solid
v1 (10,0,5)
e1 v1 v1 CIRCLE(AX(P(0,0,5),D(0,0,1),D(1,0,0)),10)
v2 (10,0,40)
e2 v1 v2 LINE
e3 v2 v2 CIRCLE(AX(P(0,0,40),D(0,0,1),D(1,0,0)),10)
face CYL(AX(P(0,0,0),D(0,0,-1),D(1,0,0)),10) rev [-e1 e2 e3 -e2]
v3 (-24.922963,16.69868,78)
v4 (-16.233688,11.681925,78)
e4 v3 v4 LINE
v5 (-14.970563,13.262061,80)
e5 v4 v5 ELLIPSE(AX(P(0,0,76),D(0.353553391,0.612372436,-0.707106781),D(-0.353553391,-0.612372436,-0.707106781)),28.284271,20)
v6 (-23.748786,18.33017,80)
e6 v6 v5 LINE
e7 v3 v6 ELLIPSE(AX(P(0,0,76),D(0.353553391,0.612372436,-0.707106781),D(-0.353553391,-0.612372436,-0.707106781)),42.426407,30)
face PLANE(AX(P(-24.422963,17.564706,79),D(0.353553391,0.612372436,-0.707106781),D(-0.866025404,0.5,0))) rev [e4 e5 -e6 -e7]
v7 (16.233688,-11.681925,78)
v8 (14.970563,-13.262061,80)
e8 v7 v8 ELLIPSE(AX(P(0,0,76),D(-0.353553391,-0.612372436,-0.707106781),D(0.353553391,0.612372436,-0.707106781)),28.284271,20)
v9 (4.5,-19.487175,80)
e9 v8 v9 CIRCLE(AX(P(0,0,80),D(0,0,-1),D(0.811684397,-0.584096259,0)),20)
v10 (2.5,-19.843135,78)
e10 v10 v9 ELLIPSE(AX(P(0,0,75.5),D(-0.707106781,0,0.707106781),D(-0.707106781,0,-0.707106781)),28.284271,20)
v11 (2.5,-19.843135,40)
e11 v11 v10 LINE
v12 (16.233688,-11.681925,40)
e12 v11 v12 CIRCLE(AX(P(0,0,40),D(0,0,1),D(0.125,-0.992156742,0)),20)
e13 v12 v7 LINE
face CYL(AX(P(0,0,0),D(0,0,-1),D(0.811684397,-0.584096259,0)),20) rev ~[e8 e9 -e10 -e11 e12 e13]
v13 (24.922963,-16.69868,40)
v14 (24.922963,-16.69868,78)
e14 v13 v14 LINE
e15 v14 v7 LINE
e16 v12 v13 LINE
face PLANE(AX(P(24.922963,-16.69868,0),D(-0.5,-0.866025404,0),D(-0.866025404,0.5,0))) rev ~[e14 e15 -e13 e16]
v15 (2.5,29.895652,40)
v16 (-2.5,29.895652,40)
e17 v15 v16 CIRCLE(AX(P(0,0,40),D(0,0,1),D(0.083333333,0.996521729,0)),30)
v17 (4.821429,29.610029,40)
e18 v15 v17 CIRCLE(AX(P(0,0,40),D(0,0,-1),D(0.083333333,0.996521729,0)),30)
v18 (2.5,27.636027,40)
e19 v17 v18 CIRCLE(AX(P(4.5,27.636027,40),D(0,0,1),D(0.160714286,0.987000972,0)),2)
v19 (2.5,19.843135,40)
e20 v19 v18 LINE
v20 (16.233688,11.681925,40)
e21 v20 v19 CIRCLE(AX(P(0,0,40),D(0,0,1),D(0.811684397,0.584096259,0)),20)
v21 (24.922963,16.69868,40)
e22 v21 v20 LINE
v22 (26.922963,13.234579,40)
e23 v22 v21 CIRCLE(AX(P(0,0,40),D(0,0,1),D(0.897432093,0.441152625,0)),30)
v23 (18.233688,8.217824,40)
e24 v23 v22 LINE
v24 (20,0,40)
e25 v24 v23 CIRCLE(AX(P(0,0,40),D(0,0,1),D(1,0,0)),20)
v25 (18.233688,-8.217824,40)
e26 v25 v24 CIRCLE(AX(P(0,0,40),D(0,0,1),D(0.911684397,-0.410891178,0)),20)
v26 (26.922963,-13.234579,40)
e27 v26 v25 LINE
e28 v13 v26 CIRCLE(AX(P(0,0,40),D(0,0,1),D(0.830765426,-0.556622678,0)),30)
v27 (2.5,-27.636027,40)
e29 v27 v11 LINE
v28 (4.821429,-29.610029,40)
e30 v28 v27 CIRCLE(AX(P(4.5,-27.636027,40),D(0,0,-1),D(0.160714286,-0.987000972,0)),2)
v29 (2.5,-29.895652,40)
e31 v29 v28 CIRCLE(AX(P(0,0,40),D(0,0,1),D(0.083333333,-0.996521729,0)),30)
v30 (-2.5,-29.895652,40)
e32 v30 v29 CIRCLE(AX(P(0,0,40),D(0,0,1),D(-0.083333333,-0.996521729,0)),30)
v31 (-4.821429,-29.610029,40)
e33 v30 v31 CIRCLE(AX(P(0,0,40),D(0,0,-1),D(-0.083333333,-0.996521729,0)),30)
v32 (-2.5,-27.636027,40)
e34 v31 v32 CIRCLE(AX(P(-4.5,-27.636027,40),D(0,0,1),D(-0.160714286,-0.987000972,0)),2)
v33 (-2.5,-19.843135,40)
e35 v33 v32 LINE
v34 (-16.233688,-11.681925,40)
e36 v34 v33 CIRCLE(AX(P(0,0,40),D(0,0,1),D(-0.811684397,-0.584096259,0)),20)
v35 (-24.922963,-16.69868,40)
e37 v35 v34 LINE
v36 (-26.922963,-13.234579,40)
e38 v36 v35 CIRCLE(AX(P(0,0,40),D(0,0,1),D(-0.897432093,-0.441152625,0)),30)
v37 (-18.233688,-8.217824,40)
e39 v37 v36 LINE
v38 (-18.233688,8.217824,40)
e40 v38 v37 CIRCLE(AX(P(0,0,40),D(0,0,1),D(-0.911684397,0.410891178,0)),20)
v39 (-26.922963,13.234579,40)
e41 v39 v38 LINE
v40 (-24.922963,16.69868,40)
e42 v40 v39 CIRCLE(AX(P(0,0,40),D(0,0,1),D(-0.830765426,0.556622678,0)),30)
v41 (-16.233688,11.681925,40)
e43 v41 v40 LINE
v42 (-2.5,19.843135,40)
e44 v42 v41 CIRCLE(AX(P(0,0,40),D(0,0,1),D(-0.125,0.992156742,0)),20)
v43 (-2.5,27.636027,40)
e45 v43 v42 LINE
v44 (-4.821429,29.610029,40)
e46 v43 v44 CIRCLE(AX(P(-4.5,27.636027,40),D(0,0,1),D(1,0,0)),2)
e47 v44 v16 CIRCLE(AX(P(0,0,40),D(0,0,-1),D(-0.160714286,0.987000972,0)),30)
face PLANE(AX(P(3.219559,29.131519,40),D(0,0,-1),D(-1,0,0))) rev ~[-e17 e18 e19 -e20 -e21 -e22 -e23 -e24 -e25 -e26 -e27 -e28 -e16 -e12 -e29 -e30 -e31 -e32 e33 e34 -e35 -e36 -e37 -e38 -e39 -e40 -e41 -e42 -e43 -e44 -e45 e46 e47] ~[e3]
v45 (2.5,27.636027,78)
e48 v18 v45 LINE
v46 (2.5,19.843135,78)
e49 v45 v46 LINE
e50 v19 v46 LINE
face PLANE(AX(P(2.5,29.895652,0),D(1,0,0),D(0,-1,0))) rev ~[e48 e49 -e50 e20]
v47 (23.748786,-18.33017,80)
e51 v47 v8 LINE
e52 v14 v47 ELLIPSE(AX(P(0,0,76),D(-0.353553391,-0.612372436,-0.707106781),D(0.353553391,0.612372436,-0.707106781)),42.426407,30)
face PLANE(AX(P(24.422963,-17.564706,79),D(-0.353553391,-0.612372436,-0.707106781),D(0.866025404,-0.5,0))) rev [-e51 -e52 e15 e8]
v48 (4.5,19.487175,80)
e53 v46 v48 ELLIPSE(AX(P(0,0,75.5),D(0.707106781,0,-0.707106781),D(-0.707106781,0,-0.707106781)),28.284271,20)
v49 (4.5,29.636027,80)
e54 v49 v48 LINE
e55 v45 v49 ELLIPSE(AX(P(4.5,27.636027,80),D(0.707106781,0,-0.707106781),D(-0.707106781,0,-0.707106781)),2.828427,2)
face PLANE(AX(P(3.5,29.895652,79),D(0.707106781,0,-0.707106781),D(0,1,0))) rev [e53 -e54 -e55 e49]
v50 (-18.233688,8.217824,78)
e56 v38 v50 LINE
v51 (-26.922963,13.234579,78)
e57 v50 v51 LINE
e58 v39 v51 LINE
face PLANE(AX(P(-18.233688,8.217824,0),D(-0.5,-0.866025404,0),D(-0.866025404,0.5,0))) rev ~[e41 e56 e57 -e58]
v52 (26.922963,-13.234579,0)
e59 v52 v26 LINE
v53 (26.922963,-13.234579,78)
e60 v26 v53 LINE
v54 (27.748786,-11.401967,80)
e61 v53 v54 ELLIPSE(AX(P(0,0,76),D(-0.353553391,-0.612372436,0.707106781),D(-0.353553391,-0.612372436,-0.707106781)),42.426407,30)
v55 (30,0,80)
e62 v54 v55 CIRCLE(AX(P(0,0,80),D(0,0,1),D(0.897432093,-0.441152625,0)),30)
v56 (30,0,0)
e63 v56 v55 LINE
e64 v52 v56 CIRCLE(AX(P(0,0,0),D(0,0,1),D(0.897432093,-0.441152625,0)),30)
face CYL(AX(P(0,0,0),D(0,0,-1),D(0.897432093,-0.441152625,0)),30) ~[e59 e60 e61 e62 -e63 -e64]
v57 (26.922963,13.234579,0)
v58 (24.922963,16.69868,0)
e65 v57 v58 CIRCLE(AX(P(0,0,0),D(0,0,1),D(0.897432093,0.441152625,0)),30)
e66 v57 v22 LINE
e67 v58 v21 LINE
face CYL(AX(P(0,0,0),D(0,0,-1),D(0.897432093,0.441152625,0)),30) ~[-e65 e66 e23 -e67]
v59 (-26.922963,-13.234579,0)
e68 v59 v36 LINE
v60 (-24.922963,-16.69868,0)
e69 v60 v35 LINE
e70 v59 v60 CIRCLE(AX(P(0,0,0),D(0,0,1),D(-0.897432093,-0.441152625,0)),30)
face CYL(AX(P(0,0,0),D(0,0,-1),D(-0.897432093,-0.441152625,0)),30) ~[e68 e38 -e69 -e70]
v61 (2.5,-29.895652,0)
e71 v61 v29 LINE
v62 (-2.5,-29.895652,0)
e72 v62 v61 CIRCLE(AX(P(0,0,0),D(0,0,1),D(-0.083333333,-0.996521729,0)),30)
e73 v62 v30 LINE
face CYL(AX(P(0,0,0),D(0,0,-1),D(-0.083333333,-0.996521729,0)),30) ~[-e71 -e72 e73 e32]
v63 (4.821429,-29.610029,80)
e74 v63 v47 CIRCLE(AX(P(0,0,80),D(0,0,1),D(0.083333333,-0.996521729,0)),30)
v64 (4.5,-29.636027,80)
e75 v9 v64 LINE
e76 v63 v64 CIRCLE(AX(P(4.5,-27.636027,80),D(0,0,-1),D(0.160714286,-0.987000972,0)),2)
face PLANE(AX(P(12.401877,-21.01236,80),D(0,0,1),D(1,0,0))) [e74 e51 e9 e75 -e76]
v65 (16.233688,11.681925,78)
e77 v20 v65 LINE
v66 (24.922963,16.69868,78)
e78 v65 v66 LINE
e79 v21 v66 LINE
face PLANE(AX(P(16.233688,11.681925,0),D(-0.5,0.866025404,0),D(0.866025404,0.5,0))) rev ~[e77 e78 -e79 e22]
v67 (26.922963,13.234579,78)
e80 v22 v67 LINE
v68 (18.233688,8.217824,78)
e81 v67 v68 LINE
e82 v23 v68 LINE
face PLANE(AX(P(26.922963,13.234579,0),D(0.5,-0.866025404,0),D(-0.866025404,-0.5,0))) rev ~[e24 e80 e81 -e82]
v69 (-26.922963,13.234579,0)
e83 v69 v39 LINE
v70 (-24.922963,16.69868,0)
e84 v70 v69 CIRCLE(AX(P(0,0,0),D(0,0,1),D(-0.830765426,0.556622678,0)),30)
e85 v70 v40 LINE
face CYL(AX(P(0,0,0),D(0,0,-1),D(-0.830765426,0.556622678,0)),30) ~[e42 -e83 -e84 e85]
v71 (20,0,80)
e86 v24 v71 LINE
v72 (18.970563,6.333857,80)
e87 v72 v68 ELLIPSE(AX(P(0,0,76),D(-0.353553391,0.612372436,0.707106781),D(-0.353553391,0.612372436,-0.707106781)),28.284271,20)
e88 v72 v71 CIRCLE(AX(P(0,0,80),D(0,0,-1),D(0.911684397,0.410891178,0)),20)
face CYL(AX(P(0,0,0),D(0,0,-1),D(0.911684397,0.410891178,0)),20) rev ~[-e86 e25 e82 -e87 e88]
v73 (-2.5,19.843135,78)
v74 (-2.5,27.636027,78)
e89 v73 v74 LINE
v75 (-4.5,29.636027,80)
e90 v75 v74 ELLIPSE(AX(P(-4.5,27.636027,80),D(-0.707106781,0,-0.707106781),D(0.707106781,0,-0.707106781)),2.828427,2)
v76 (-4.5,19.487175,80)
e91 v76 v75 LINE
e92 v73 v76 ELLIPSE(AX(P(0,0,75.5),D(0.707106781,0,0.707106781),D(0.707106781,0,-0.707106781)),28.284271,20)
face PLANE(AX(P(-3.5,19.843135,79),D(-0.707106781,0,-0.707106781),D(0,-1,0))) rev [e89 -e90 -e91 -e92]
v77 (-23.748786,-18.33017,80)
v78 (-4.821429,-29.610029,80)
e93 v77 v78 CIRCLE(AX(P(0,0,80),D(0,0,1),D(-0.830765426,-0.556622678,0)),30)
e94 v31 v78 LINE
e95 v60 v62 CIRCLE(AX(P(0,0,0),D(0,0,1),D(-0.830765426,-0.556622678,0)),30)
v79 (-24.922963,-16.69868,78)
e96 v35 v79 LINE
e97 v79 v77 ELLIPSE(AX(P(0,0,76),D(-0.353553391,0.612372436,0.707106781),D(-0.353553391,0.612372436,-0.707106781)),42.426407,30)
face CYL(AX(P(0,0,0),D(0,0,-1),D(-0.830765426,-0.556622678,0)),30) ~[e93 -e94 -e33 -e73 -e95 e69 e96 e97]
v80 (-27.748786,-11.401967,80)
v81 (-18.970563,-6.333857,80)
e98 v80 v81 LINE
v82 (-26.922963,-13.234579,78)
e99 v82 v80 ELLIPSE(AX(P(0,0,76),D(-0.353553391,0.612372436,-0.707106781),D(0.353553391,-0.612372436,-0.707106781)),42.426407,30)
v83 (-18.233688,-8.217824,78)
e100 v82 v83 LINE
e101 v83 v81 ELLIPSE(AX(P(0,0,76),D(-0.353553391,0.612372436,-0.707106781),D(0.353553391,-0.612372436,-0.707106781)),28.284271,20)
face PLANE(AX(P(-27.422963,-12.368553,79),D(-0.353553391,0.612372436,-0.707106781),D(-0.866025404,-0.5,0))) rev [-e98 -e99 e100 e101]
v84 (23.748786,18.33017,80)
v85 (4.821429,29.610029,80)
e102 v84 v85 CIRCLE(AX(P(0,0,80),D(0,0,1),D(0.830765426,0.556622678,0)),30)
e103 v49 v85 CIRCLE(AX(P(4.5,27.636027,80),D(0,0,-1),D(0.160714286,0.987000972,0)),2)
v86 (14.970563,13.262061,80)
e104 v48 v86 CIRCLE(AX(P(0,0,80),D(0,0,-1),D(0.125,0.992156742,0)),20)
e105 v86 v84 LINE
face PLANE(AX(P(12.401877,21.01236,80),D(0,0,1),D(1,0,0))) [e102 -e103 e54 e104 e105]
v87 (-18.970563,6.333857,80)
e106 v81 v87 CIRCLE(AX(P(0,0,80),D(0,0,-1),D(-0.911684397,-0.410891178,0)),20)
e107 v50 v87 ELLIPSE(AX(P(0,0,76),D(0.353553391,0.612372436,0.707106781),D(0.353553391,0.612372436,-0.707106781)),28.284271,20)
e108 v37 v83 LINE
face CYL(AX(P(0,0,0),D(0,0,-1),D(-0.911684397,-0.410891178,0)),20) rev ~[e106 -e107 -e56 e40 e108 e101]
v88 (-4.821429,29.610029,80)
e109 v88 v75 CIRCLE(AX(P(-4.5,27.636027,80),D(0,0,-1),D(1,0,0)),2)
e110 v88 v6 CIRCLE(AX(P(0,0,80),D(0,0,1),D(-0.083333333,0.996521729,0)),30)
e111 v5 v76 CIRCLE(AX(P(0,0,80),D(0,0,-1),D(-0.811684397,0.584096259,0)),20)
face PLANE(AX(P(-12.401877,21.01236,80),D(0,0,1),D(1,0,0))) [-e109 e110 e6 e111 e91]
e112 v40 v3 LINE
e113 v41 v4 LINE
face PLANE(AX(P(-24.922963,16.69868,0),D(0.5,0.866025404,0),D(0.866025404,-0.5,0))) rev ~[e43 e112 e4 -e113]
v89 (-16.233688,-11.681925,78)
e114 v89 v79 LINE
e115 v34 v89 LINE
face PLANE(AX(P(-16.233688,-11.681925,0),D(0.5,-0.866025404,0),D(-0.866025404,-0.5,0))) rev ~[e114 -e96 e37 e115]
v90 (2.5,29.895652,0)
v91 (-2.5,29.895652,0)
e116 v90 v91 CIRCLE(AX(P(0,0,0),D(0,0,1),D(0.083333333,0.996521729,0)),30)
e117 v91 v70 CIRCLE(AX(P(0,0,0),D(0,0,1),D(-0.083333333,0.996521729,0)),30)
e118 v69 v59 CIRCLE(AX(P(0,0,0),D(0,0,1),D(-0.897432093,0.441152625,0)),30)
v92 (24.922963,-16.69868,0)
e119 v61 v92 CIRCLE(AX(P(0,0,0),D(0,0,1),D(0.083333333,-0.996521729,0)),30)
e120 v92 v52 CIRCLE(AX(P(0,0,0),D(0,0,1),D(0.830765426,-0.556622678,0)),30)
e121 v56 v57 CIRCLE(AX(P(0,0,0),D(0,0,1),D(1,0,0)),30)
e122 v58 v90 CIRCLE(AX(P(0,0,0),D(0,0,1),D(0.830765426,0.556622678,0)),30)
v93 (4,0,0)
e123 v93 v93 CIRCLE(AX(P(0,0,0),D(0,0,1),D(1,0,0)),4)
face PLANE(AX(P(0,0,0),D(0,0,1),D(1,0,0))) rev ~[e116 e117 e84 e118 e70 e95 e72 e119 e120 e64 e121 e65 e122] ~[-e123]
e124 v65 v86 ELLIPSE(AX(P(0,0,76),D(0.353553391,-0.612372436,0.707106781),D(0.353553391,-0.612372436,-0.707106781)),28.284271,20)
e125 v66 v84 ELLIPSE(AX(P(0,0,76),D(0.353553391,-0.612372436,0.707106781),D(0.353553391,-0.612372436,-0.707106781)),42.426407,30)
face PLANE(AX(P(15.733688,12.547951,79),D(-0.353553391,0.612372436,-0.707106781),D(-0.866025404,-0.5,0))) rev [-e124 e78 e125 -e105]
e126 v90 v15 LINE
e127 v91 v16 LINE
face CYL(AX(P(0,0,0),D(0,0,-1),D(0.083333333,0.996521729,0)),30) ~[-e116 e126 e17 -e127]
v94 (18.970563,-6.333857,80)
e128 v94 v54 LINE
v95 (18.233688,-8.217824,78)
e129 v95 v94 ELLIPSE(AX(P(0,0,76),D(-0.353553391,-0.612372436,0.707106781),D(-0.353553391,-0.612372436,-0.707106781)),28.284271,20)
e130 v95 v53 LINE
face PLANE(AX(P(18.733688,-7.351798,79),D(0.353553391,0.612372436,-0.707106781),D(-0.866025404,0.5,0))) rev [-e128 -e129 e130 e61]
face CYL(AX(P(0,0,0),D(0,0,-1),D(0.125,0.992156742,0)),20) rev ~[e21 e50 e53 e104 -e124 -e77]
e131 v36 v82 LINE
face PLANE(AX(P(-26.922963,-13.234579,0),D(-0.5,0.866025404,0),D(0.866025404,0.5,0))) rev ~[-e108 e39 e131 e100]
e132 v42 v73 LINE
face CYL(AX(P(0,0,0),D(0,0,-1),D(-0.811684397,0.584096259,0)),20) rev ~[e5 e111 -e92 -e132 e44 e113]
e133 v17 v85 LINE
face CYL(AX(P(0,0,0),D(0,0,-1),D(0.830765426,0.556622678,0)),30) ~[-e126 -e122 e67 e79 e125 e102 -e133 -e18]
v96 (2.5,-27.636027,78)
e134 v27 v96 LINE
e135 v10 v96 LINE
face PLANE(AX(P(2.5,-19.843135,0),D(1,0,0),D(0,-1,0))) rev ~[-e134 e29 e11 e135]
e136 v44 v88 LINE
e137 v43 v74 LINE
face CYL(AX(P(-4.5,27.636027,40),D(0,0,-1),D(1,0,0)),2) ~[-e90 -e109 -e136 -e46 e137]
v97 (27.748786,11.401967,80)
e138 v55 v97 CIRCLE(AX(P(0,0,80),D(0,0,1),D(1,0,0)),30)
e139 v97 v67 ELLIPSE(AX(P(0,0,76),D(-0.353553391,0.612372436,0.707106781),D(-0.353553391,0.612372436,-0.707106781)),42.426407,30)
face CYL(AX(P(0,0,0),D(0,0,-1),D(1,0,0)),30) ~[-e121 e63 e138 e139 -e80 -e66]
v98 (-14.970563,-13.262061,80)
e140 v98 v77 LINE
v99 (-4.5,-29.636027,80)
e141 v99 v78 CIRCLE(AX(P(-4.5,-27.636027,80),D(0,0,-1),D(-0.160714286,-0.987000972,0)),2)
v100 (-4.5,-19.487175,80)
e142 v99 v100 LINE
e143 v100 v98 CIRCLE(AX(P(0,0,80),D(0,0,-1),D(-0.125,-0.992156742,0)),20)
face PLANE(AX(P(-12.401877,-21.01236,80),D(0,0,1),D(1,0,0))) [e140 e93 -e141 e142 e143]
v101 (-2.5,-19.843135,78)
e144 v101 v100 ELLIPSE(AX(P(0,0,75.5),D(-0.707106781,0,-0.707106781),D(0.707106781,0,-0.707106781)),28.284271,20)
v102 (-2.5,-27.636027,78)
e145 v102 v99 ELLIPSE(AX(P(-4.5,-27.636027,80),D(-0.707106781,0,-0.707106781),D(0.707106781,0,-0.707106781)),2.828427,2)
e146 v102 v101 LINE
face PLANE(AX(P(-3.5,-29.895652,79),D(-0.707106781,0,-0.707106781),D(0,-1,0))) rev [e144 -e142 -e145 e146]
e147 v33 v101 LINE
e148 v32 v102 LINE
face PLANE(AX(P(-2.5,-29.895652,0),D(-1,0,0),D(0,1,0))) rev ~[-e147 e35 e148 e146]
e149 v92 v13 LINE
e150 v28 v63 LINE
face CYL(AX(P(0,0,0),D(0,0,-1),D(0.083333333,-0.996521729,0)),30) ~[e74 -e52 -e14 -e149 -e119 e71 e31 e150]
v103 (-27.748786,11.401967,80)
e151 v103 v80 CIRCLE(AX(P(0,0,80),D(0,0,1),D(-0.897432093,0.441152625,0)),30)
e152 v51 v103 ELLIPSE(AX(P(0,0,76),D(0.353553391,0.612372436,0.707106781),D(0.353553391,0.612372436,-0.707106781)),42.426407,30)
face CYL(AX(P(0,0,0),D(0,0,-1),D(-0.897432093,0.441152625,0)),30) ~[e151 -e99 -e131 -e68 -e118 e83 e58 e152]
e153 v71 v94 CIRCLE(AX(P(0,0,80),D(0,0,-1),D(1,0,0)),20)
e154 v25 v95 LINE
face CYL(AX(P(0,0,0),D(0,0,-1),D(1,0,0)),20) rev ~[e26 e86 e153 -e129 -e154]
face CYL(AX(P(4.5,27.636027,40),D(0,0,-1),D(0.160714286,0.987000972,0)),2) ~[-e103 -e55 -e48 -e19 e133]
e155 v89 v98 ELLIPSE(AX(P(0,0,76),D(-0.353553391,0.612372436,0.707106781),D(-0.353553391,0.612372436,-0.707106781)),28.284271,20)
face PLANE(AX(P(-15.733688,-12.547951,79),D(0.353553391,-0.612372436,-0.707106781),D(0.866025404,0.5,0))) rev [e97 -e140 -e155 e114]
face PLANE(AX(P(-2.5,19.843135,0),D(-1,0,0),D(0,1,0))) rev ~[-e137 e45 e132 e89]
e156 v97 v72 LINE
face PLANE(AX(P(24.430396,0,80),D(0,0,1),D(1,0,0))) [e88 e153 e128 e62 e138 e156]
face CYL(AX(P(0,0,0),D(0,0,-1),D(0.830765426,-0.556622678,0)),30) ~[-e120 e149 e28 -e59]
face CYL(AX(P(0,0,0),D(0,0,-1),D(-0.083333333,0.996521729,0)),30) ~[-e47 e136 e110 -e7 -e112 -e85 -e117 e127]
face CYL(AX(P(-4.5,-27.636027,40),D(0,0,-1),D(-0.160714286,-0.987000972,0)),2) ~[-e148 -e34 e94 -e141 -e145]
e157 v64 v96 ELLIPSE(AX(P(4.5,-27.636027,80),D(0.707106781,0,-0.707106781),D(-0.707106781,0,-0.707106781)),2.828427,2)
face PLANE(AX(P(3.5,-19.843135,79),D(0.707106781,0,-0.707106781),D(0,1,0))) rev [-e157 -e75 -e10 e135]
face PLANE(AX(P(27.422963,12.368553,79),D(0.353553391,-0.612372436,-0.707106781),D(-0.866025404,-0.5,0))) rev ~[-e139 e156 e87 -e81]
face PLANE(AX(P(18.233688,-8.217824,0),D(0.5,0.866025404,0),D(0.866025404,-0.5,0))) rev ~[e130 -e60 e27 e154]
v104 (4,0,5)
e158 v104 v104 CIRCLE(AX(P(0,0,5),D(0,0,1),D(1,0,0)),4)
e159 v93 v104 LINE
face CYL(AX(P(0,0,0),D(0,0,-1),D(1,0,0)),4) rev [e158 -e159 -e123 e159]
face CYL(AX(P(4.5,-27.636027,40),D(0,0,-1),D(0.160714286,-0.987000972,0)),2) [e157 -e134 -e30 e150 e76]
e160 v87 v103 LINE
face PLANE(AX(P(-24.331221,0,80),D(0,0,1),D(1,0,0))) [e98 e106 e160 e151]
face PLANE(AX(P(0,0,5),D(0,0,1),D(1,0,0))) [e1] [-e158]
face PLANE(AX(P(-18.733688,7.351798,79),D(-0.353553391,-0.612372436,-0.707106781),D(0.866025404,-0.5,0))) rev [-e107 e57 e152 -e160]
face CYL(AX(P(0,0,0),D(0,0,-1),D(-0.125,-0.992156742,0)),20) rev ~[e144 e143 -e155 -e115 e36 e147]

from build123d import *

# Parameters (mm, degrees)
F1_DEPTH    = 80
F0_R        = 10
F2_DEPTH    = 40
F0_R_2      = 4
F3_DEPTH    = 5
F4_SIZE     = 2
F5_T1_DEPTH = 43.847334297


# Not quite as in the source:
# - a fillet or chamfer that OpenCascade refuses, or shapes differently, is made with other operations: its cross-section is extruded or revolved along the edge and cut away or added


with BuildPart() as f1:
    # F0 (on Top) → F1 (new body)
    with BuildSketch(Plane.XY):
        with BuildLine():
            ThreePointArc((26.9229627936, -13.2345787395), (29.220616727, -6.7937881992), (30, 0))
            ThreePointArc((30, 0), (29.220616727, 6.7937881992), (26.9229627936, 13.2345787395))
            Line((26.9229627936, 13.2345787395), (18.2336879396, 8.2178235635))
            ThreePointArc((18.2336879396, 8.2178235635), (19.5534365112, 4.2027515515), (20, 0))
            ThreePointArc((20, 0), (19.5534365112, -4.2027515515), (18.2336879396, -8.2178235635))
            Line((18.2336879396, -8.2178235635), (26.9229627936, -13.2345787395))
        make_face()
    extrude(amount=F1_DEPTH)



with BuildPart() as f1b:
    # F0 (on Top) → F1, piece 2 (new body)
    with BuildSketch(Plane.XY):
        with BuildLine():
            Line((16.2336879396, 11.6819251786), (24.9229627936, 16.6986803547))
            ThreePointArc((24.9229627936, 16.6986803547), (15.21659411, 25.8545018071), (2.5, 29.8956518578))
            Line((2.5, 29.8956518578), (2.5, 19.843134833))
            ThreePointArc((2.5, 19.843134833), (10.2170984976, 17.1933387767), (16.2336879396, 11.6819251786))
        make_face()
    extrude(amount=F1_DEPTH)


with BuildPart() as f1c:
    # F0 (on Top) → F1, piece 3 (new body)
    with BuildSketch(Plane.XY):
        with BuildLine():
            ThreePointArc((2.5, -29.8956518578), (15.21659411, -25.8545018071), (24.9229627936, -16.6986803547))
            Line((24.9229627936, -16.6986803547), (16.2336879396, -11.6819251786))
            ThreePointArc((16.2336879396, -11.6819251786), (10.2170984976, -17.1933387767), (2.5, -19.843134833))
            Line((2.5, -19.843134833), (2.5, -29.8956518578))
        make_face()
    extrude(amount=F1_DEPTH)


with BuildPart() as f1d:
    # F0 (on Top) → F1, piece 4 (new body)
    with BuildSketch(Plane.XY):
        with BuildLine():
            Line((-2.5, 19.843134833), (-2.5, 29.8956518578))
            ThreePointArc((-2.5, 29.8956518578), (-15.21659411, 25.8545018071), (-24.9229627936, 16.6986803547))
            Line((-24.9229627936, 16.6986803547), (-16.2336879396, 11.6819251786))
            ThreePointArc((-16.2336879396, 11.6819251786), (-10.2170984976, 17.1933387767), (-2.5, 19.843134833))
        make_face()
    extrude(amount=F1_DEPTH)


with BuildPart() as f1e:
    # F0 (on Top) → F1, piece 5 (new body)
    with BuildSketch(Plane.XY):
        with BuildLine():
            ThreePointArc((-24.9229627936, -16.6986803547), (-15.21659411, -25.8545018071), (-2.5, -29.8956518578))
            Line((-2.5, -29.8956518578), (-2.5, -19.843134833))
            ThreePointArc((-2.5, -19.843134833), (-10.2170984976, -17.1933387767), (-16.2336879396, -11.6819251786))
            Line((-16.2336879396, -11.6819251786), (-24.9229627936, -16.6986803547))
        make_face()
    extrude(amount=F1_DEPTH)


with BuildPart() as f1f:
    # F0 (on Top) → F1, piece 6 (new body)
    with BuildSketch(Plane.XY):
        with BuildLine():
            Line((-18.2336879396, 8.2178235635), (-26.9229627936, 13.2345787395))
            ThreePointArc((-26.9229627936, 13.2345787395), (-30, 0), (-26.9229627936, -13.2345787395))
            Line((-26.9229627936, -13.2345787395), (-18.2336879396, -8.2178235635))
            ThreePointArc((-18.2336879396, -8.2178235635), (-20, 0), (-18.2336879396, 8.2178235635))
        make_face()
    extrude(amount=F1_DEPTH)


with BuildPart() as f1_1:
    add(f1.part)

    add(f1b.part)  # F2 merges F1b

    add(f1c.part)  # F2 merges F1c

    add(f1d.part)  # F2 merges F1d

    add(f1e.part)  # F2 merges F1e

    add(f1f.part)  # F2 merges F1f
    # F0 (on Top) → F2 (join)
    with BuildSketch(Plane.XY):
        with BuildLine():
            Line((18.2336879396, 8.2178235635), (26.9229627936, 13.2345787395))
            ThreePointArc((26.9229627936, 13.2345787395), (25.9807621135, 15), (24.9229627936, 16.6986803547))
            Line((24.9229627936, 16.6986803547), (16.2336879396, 11.6819251786))
            ThreePointArc((16.2336879396, 11.6819251786), (17.3205080757, 10), (18.2336879396, 8.2178235635))
        make_face()
        with BuildLine():
            ThreePointArc((24.9229627936, -16.6986803547), (25.9807621135, -15), (26.9229627936, -13.2345787395))
            Line((26.9229627936, -13.2345787395), (18.2336879396, -8.2178235635))
            ThreePointArc((18.2336879396, -8.2178235635), (17.3205080757, -10), (16.2336879396, -11.6819251786))
            Line((16.2336879396, -11.6819251786), (24.9229627936, -16.6986803547))
        make_face()
        with BuildLine():
            ThreePointArc((20, 0), (19.5534365112, 4.2027515515), (18.2336879396, 8.2178235635))
            ThreePointArc((18.2336879396, 8.2178235635), (17.3205080757, 10), (16.2336879396, 11.6819251786))
            ThreePointArc((16.2336879396, 11.6819251786), (10.2170984976, 17.1933387767), (2.5, 19.843134833))
            ThreePointArc((2.5, 19.843134833), (0, 20), (-2.5, 19.843134833))
            ThreePointArc((-2.5, 19.843134833), (-10.2170984976, 17.1933387767), (-16.2336879396, 11.6819251786))
            ThreePointArc((-16.2336879396, 11.6819251786), (-17.3205080757, 10), (-18.2336879396, 8.2178235635))
            ThreePointArc((-18.2336879396, 8.2178235635), (-20, 0), (-18.2336879396, -8.2178235635))
            ThreePointArc((-18.2336879396, -8.2178235635), (-17.3205080757, -10), (-16.2336879396, -11.6819251786))
            ThreePointArc((-16.2336879396, -11.6819251786), (-10.2170984976, -17.1933387767), (-2.5, -19.843134833))
            ThreePointArc((-2.5, -19.843134833), (0, -20), (2.5, -19.843134833))
            ThreePointArc((2.5, -19.843134833), (10.2170984976, -17.1933387767), (16.2336879396, -11.6819251786))
            ThreePointArc((16.2336879396, -11.6819251786), (17.3205080757, -10), (18.2336879396, -8.2178235635))
            ThreePointArc((18.2336879396, -8.2178235635), (19.5534365112, -4.2027515515), (20, 0))
        make_face()
        Circle(F0_R, mode=Mode.SUBTRACT)
        with BuildLine():
            Line((2.5, 19.843134833), (2.5, 29.8956518578))
            ThreePointArc((2.5, 29.8956518578), (0, 30), (-2.5, 29.8956518578))
            Line((-2.5, 29.8956518578), (-2.5, 19.843134833))
            ThreePointArc((-2.5, 19.843134833), (0, 20), (2.5, 19.843134833))
        make_face()
        with BuildLine():
            ThreePointArc((-2.5, -29.8956518578), (0, -30), (2.5, -29.8956518578))
            Line((2.5, -29.8956518578), (2.5, -19.843134833))
            ThreePointArc((2.5, -19.843134833), (0, -20), (-2.5, -19.843134833))
            Line((-2.5, -19.843134833), (-2.5, -29.8956518578))
        make_face()
        with BuildLine():
            Line((-16.2336879396, 11.6819251786), (-24.9229627936, 16.6986803547))
            ThreePointArc((-24.9229627936, 16.6986803547), (-25.9807621135, 15), (-26.9229627936, 13.2345787395))
            Line((-26.9229627936, 13.2345787395), (-18.2336879396, 8.2178235635))
            ThreePointArc((-18.2336879396, 8.2178235635), (-17.3205080757, 10), (-16.2336879396, 11.6819251786))
        make_face()
        with BuildLine():
            ThreePointArc((-26.9229627936, -13.2345787395), (-25.9807621135, -15), (-24.9229627936, -16.6986803547))
            Line((-24.9229627936, -16.6986803547), (-16.2336879396, -11.6819251786))
            ThreePointArc((-16.2336879396, -11.6819251786), (-17.3205080757, -10), (-18.2336879396, -8.2178235635))
            Line((-18.2336879396, -8.2178235635), (-26.9229627936, -13.2345787395))
        make_face()
    extrude(amount=F2_DEPTH)

    # F0 (on Top) → F3 (join)
    with BuildSketch(Plane.XY):
        Circle(F0_R)
        Circle(F0_R_2, mode=Mode.SUBTRACT)
    extrude(amount=F3_DEPTH)

    # F4
    f4_edges = [f1_1.edges().sort_by_distance(p)[0] for p in [
        (-20.578325, 14.190303, 80),
        (-22.578325, 10.726201, 80),
        (-22.578325, -10.726201, 80),
        (-20.578325, -14.190303, 80),
        (20.578325, -14.190303, 80),
        (22.578325, -10.726201, 80),
        (22.578325, 10.726201, 80),
        (20.578325, 14.190303, 80),
        (-2.5, 24.869393, 80),
        (2.5, 24.869393, 80),
        (2.5, -24.869393, 80),
        (-2.5, -24.869393, 80),
    ]]
    chamfer(f4_edges, length=F4_SIZE)

    # F5: fillet of radius 2 on 6 edges, made by hand

    # F5_s2 → F5_t1 (cut)
    with BuildSketch(Plane.XY.offset(40)):
        with BuildLine():
            ThreePointArc((-2.5, 27.6360272109), (-3.2044030609, 29.1596507114), (-4.8214285714, 29.6100291545))
            ThreePointArc((-4.8214285714, 29.6100291545), (-3.6634988964, 29.7754727223), (-2.5, 29.8956518578))
            Line((-2.5, 29.8956518578), (-2.5, 27.6360272109))
        make_face()
        with BuildLine():
            ThreePointArc((4.8214285714, 29.6100291545), (3.2044030609, 29.1596507114), (2.5, 27.6360272109))
            Line((2.5, 27.6360272109), (2.5, 29.8956518578))
            ThreePointArc((2.5, 29.8956518578), (3.6634988964, 29.7754727223), (4.8214285714, 29.6100291545))
        make_face()
        with BuildLine():
            ThreePointArc((-4.8214285714, -29.6100291545), (-3.2044030609, -29.1596507114), (-2.5, -27.6360272109))
            Line((-2.5, -27.6360272109), (-2.5, -29.8956518578))
            ThreePointArc((-2.5, -29.8956518578), (-3.6634988964, -29.7754727223), (-4.8214285714, -29.6100291545))
        make_face()
        with BuildLine():
            ThreePointArc((4.8214285714, -29.6100291545), (3.2044030609, -29.1596507114), (2.5, -27.6360272109))
            Line((2.5, -27.6360272109), (2.5, -29.8956518578))
            ThreePointArc((2.5, -29.8956518578), (3.6634988964, -29.7754727223), (4.8214285714, -29.6100291545))
        make_face()
    extrude(amount=F5_T1_DEPTH, mode=Mode.SUBTRACT)


solid = f1_1.part
